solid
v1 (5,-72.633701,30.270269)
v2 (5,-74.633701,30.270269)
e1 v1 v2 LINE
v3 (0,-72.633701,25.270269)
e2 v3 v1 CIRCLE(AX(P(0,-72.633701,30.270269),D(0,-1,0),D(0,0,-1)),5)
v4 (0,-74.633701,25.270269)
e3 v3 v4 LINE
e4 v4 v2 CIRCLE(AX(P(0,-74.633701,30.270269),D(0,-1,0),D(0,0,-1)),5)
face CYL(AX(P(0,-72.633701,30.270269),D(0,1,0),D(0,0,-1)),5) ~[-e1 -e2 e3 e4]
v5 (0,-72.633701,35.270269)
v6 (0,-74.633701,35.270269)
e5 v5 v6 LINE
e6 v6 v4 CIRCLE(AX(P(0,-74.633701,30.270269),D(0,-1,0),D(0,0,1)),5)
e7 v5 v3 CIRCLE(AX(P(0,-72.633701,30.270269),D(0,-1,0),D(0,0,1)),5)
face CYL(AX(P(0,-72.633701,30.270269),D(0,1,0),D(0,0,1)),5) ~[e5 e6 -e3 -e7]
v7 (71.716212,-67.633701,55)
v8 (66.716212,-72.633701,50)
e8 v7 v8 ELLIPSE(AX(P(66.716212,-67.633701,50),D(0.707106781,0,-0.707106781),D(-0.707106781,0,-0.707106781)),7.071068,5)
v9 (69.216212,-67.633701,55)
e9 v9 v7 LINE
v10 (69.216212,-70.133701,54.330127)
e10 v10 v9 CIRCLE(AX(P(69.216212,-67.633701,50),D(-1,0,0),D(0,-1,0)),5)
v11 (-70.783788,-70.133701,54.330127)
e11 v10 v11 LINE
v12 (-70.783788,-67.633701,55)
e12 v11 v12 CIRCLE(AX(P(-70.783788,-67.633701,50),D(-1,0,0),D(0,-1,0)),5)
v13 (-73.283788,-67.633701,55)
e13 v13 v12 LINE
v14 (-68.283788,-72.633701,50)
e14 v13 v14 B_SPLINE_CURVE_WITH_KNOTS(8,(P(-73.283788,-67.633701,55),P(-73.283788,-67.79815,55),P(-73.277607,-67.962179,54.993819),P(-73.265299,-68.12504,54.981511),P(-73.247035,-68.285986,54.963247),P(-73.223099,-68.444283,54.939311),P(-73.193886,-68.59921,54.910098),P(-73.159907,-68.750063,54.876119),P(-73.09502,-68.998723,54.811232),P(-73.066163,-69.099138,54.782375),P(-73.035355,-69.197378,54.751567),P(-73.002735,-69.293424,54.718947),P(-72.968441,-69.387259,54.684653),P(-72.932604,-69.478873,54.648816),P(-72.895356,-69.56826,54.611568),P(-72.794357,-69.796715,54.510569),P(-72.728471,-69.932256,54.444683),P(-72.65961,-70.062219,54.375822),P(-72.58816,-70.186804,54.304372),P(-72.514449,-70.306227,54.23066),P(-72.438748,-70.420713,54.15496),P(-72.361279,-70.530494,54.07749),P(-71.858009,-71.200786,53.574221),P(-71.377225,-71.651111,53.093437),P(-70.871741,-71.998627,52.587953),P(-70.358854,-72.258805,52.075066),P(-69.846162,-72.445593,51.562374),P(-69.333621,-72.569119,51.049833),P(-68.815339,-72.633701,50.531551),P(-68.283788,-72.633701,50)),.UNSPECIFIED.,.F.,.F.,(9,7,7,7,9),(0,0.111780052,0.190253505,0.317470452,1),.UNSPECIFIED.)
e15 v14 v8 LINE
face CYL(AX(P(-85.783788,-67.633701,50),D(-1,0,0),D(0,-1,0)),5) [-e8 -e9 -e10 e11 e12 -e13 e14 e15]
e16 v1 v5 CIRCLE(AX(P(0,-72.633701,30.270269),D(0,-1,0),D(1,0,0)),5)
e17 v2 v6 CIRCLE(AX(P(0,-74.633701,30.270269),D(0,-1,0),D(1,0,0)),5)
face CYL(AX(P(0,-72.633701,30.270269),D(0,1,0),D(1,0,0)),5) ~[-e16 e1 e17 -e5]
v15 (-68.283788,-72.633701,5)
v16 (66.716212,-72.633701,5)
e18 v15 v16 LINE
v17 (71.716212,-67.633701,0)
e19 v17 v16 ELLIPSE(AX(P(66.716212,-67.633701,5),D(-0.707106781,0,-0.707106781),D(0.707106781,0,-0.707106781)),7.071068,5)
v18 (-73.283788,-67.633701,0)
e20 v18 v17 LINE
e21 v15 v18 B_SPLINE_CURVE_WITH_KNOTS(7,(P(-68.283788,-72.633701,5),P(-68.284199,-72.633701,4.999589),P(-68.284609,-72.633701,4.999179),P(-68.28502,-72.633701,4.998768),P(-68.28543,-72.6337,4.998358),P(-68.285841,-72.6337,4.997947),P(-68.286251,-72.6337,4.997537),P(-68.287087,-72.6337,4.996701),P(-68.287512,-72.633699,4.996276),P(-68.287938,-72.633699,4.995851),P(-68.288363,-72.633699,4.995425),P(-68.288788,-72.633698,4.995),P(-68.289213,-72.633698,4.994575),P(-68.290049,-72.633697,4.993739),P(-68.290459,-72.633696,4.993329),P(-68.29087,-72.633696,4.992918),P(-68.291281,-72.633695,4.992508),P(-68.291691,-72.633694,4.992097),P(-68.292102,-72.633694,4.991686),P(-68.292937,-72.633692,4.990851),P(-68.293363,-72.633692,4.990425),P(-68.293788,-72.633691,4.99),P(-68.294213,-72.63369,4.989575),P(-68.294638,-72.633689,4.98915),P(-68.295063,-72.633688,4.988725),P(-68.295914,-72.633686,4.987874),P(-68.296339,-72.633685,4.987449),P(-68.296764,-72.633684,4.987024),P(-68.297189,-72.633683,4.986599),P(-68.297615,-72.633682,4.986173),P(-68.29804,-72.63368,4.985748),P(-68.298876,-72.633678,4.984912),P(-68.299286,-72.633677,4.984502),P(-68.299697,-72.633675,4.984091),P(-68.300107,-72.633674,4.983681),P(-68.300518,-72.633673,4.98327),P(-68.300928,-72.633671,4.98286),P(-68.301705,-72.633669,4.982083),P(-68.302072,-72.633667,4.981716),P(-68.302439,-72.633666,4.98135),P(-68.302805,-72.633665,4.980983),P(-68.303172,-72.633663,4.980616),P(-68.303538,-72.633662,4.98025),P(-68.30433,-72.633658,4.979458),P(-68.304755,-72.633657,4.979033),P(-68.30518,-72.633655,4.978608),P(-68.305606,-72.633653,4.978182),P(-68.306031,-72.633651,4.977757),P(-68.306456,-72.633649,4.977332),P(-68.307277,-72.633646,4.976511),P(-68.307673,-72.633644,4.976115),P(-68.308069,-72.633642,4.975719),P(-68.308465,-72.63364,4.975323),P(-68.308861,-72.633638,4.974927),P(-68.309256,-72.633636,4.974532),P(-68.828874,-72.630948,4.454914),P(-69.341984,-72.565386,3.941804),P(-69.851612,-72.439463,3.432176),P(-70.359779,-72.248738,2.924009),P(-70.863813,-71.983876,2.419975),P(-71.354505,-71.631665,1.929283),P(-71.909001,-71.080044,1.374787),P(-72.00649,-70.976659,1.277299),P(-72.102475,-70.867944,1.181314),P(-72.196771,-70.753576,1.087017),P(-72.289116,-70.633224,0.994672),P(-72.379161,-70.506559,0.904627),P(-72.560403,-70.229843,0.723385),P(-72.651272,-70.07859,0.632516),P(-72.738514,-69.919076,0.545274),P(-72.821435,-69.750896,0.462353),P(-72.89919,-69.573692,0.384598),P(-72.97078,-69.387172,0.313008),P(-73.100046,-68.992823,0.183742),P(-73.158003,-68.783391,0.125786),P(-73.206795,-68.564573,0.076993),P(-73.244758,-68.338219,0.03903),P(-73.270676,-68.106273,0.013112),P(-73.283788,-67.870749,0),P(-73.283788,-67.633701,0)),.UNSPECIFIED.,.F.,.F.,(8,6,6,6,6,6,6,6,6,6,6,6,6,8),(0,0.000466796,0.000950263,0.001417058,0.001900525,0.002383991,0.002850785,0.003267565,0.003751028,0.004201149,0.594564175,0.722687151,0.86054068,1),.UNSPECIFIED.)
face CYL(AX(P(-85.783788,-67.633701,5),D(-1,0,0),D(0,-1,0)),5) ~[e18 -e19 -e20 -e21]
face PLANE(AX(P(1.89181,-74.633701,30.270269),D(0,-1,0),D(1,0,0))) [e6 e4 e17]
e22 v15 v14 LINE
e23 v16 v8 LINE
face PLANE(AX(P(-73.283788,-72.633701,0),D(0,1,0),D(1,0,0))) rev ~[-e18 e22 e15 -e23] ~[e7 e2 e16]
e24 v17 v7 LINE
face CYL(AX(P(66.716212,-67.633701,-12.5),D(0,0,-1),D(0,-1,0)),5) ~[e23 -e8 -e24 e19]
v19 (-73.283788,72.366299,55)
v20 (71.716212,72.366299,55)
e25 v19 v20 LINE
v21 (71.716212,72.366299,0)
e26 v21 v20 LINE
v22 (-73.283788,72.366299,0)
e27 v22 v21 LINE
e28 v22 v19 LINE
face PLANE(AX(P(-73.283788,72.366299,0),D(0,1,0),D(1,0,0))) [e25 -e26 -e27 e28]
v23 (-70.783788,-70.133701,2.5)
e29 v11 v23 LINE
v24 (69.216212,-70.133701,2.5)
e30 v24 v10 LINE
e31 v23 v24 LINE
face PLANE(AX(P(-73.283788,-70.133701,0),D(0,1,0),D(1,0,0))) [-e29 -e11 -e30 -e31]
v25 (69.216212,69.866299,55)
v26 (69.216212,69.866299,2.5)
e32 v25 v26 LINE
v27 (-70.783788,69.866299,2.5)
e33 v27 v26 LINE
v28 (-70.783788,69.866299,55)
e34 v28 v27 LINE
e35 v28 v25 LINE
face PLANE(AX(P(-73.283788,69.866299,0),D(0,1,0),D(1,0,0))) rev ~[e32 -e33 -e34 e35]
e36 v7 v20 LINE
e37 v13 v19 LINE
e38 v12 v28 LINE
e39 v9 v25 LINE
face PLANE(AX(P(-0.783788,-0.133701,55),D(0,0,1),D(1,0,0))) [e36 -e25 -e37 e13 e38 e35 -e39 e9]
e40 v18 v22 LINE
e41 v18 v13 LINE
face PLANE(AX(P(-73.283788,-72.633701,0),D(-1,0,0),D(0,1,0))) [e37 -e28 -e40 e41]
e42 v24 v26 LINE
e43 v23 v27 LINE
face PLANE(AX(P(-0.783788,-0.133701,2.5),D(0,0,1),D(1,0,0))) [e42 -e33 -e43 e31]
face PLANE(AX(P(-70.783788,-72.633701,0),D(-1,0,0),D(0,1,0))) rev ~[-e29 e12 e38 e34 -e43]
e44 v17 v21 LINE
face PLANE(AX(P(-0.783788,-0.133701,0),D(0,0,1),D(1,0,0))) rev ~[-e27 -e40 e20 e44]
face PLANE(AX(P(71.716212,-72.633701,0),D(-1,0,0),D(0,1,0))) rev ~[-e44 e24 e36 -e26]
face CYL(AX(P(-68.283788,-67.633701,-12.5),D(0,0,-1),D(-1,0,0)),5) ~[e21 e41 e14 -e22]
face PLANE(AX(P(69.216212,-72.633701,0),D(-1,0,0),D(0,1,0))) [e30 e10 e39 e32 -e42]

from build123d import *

# Parameters (mm, degrees)
F0_W        = 145
F0_H        = 145
F1_DEPTH    = 55
F2_T        = -2.5
F3_T1_DEPTH = 80
F3_T3_DEPTH = 170
F5_DEPTH    = 2


# Not quite as in the source:
# - a fillet or chamfer that OpenCascade refuses, or shapes differently, is made with other operations: its cross-section is extruded or revolved along the edge and cut away or added


with BuildPart() as f1:
    # F0 (on Top) → F1 (new body)
    with BuildSketch(Plane.XY):
        with Locations((-0.7837880796, -0.1337006688)):
            Rectangle(F0_W, F0_H)
    extrude(amount=F1_DEPTH)

    # F2
    f2_openings = [f1.faces().sort_by_distance(p)[0] for p in [
        (-0.783788, -0.133701, 55),
    ]]
    offset(amount=F2_T, openings=f2_openings)

    # F3: fillet of radius 5 on 4 edges, made by hand

    # F3_s2 → F3_t1 (cut)
    with BuildSketch(Plane.XY.offset(-12.5)):
        with BuildLine():
            ThreePointArc((-73.2837880796, -67.6337006688), (-71.8193219856, -71.1692345747), (-68.2837880796, -72.6337006688))
            Line((-68.2837880796, -72.6337006688), (-73.2837880796, -72.6337006688))
            Line((-73.2837880796, -72.6337006688), (-73.2837880796, -67.6337006688))
        make_face()
        with BuildLine():
            ThreePointArc((66.7162119204, -72.6337006688), (70.2517458263, -71.1692345747), (71.7162119204, -67.6337006688))
            Line((71.7162119204, -67.6337006688), (71.7162119204, -72.6337006688))
            Line((71.7162119204, -72.6337006688), (66.7162119204, -72.6337006688))
        make_face()
    extrude(amount=F3_T1_DEPTH, mode=Mode.SUBTRACT)

    # F3_s4 → F3_t3 (cut)
    with BuildSketch(Plane.YZ.offset(-85.7837880796)):
        with BuildLine():
            ThreePointArc((-72.6337006688, 5), (-71.1692345747, 1.4644660941), (-67.6337006688, 0))
            Line((-67.6337006688, 0), (-72.6337006688, 0))
            Line((-72.6337006688, 0), (-72.6337006688, 5))
        make_face()
        with BuildLine():
            ThreePointArc((-72.6337006688, 50), (-71.1692345747, 53.5355339059), (-67.6337006688, 55))
            Line((-67.6337006688, 55), (-72.6337006688, 55))
            Line((-72.6337006688, 55), (-72.6337006688, 50))
        make_face()
    extrude(amount=F3_T3_DEPTH, mode=Mode.SUBTRACT)

    # F4 (on face) → F5 (join)
    with BuildSketch(Plane.XZ.offset(72.6337006688)):
        with BuildLine():
            ThreePointArc((0, 25.2702692018), (3.5355339059, 26.7347352958), (5, 30.2702692018))
            ThreePointArc((5, 30.2702692018), (3.5355339059, 33.8058031077), (0, 35.2702692018))
            Line((0, 35.2702692018), (0, 25.2702692018))
        make_face()
        with BuildLine():
            Line((0, 25.2702692018), (0, 35.2702692018))
            ThreePointArc((0, 35.2702692018), (-5, 30.2702692018), (0, 25.2702692018))
        make_face()
    extrude(amount=F5_DEPTH)


solid = f1.part
